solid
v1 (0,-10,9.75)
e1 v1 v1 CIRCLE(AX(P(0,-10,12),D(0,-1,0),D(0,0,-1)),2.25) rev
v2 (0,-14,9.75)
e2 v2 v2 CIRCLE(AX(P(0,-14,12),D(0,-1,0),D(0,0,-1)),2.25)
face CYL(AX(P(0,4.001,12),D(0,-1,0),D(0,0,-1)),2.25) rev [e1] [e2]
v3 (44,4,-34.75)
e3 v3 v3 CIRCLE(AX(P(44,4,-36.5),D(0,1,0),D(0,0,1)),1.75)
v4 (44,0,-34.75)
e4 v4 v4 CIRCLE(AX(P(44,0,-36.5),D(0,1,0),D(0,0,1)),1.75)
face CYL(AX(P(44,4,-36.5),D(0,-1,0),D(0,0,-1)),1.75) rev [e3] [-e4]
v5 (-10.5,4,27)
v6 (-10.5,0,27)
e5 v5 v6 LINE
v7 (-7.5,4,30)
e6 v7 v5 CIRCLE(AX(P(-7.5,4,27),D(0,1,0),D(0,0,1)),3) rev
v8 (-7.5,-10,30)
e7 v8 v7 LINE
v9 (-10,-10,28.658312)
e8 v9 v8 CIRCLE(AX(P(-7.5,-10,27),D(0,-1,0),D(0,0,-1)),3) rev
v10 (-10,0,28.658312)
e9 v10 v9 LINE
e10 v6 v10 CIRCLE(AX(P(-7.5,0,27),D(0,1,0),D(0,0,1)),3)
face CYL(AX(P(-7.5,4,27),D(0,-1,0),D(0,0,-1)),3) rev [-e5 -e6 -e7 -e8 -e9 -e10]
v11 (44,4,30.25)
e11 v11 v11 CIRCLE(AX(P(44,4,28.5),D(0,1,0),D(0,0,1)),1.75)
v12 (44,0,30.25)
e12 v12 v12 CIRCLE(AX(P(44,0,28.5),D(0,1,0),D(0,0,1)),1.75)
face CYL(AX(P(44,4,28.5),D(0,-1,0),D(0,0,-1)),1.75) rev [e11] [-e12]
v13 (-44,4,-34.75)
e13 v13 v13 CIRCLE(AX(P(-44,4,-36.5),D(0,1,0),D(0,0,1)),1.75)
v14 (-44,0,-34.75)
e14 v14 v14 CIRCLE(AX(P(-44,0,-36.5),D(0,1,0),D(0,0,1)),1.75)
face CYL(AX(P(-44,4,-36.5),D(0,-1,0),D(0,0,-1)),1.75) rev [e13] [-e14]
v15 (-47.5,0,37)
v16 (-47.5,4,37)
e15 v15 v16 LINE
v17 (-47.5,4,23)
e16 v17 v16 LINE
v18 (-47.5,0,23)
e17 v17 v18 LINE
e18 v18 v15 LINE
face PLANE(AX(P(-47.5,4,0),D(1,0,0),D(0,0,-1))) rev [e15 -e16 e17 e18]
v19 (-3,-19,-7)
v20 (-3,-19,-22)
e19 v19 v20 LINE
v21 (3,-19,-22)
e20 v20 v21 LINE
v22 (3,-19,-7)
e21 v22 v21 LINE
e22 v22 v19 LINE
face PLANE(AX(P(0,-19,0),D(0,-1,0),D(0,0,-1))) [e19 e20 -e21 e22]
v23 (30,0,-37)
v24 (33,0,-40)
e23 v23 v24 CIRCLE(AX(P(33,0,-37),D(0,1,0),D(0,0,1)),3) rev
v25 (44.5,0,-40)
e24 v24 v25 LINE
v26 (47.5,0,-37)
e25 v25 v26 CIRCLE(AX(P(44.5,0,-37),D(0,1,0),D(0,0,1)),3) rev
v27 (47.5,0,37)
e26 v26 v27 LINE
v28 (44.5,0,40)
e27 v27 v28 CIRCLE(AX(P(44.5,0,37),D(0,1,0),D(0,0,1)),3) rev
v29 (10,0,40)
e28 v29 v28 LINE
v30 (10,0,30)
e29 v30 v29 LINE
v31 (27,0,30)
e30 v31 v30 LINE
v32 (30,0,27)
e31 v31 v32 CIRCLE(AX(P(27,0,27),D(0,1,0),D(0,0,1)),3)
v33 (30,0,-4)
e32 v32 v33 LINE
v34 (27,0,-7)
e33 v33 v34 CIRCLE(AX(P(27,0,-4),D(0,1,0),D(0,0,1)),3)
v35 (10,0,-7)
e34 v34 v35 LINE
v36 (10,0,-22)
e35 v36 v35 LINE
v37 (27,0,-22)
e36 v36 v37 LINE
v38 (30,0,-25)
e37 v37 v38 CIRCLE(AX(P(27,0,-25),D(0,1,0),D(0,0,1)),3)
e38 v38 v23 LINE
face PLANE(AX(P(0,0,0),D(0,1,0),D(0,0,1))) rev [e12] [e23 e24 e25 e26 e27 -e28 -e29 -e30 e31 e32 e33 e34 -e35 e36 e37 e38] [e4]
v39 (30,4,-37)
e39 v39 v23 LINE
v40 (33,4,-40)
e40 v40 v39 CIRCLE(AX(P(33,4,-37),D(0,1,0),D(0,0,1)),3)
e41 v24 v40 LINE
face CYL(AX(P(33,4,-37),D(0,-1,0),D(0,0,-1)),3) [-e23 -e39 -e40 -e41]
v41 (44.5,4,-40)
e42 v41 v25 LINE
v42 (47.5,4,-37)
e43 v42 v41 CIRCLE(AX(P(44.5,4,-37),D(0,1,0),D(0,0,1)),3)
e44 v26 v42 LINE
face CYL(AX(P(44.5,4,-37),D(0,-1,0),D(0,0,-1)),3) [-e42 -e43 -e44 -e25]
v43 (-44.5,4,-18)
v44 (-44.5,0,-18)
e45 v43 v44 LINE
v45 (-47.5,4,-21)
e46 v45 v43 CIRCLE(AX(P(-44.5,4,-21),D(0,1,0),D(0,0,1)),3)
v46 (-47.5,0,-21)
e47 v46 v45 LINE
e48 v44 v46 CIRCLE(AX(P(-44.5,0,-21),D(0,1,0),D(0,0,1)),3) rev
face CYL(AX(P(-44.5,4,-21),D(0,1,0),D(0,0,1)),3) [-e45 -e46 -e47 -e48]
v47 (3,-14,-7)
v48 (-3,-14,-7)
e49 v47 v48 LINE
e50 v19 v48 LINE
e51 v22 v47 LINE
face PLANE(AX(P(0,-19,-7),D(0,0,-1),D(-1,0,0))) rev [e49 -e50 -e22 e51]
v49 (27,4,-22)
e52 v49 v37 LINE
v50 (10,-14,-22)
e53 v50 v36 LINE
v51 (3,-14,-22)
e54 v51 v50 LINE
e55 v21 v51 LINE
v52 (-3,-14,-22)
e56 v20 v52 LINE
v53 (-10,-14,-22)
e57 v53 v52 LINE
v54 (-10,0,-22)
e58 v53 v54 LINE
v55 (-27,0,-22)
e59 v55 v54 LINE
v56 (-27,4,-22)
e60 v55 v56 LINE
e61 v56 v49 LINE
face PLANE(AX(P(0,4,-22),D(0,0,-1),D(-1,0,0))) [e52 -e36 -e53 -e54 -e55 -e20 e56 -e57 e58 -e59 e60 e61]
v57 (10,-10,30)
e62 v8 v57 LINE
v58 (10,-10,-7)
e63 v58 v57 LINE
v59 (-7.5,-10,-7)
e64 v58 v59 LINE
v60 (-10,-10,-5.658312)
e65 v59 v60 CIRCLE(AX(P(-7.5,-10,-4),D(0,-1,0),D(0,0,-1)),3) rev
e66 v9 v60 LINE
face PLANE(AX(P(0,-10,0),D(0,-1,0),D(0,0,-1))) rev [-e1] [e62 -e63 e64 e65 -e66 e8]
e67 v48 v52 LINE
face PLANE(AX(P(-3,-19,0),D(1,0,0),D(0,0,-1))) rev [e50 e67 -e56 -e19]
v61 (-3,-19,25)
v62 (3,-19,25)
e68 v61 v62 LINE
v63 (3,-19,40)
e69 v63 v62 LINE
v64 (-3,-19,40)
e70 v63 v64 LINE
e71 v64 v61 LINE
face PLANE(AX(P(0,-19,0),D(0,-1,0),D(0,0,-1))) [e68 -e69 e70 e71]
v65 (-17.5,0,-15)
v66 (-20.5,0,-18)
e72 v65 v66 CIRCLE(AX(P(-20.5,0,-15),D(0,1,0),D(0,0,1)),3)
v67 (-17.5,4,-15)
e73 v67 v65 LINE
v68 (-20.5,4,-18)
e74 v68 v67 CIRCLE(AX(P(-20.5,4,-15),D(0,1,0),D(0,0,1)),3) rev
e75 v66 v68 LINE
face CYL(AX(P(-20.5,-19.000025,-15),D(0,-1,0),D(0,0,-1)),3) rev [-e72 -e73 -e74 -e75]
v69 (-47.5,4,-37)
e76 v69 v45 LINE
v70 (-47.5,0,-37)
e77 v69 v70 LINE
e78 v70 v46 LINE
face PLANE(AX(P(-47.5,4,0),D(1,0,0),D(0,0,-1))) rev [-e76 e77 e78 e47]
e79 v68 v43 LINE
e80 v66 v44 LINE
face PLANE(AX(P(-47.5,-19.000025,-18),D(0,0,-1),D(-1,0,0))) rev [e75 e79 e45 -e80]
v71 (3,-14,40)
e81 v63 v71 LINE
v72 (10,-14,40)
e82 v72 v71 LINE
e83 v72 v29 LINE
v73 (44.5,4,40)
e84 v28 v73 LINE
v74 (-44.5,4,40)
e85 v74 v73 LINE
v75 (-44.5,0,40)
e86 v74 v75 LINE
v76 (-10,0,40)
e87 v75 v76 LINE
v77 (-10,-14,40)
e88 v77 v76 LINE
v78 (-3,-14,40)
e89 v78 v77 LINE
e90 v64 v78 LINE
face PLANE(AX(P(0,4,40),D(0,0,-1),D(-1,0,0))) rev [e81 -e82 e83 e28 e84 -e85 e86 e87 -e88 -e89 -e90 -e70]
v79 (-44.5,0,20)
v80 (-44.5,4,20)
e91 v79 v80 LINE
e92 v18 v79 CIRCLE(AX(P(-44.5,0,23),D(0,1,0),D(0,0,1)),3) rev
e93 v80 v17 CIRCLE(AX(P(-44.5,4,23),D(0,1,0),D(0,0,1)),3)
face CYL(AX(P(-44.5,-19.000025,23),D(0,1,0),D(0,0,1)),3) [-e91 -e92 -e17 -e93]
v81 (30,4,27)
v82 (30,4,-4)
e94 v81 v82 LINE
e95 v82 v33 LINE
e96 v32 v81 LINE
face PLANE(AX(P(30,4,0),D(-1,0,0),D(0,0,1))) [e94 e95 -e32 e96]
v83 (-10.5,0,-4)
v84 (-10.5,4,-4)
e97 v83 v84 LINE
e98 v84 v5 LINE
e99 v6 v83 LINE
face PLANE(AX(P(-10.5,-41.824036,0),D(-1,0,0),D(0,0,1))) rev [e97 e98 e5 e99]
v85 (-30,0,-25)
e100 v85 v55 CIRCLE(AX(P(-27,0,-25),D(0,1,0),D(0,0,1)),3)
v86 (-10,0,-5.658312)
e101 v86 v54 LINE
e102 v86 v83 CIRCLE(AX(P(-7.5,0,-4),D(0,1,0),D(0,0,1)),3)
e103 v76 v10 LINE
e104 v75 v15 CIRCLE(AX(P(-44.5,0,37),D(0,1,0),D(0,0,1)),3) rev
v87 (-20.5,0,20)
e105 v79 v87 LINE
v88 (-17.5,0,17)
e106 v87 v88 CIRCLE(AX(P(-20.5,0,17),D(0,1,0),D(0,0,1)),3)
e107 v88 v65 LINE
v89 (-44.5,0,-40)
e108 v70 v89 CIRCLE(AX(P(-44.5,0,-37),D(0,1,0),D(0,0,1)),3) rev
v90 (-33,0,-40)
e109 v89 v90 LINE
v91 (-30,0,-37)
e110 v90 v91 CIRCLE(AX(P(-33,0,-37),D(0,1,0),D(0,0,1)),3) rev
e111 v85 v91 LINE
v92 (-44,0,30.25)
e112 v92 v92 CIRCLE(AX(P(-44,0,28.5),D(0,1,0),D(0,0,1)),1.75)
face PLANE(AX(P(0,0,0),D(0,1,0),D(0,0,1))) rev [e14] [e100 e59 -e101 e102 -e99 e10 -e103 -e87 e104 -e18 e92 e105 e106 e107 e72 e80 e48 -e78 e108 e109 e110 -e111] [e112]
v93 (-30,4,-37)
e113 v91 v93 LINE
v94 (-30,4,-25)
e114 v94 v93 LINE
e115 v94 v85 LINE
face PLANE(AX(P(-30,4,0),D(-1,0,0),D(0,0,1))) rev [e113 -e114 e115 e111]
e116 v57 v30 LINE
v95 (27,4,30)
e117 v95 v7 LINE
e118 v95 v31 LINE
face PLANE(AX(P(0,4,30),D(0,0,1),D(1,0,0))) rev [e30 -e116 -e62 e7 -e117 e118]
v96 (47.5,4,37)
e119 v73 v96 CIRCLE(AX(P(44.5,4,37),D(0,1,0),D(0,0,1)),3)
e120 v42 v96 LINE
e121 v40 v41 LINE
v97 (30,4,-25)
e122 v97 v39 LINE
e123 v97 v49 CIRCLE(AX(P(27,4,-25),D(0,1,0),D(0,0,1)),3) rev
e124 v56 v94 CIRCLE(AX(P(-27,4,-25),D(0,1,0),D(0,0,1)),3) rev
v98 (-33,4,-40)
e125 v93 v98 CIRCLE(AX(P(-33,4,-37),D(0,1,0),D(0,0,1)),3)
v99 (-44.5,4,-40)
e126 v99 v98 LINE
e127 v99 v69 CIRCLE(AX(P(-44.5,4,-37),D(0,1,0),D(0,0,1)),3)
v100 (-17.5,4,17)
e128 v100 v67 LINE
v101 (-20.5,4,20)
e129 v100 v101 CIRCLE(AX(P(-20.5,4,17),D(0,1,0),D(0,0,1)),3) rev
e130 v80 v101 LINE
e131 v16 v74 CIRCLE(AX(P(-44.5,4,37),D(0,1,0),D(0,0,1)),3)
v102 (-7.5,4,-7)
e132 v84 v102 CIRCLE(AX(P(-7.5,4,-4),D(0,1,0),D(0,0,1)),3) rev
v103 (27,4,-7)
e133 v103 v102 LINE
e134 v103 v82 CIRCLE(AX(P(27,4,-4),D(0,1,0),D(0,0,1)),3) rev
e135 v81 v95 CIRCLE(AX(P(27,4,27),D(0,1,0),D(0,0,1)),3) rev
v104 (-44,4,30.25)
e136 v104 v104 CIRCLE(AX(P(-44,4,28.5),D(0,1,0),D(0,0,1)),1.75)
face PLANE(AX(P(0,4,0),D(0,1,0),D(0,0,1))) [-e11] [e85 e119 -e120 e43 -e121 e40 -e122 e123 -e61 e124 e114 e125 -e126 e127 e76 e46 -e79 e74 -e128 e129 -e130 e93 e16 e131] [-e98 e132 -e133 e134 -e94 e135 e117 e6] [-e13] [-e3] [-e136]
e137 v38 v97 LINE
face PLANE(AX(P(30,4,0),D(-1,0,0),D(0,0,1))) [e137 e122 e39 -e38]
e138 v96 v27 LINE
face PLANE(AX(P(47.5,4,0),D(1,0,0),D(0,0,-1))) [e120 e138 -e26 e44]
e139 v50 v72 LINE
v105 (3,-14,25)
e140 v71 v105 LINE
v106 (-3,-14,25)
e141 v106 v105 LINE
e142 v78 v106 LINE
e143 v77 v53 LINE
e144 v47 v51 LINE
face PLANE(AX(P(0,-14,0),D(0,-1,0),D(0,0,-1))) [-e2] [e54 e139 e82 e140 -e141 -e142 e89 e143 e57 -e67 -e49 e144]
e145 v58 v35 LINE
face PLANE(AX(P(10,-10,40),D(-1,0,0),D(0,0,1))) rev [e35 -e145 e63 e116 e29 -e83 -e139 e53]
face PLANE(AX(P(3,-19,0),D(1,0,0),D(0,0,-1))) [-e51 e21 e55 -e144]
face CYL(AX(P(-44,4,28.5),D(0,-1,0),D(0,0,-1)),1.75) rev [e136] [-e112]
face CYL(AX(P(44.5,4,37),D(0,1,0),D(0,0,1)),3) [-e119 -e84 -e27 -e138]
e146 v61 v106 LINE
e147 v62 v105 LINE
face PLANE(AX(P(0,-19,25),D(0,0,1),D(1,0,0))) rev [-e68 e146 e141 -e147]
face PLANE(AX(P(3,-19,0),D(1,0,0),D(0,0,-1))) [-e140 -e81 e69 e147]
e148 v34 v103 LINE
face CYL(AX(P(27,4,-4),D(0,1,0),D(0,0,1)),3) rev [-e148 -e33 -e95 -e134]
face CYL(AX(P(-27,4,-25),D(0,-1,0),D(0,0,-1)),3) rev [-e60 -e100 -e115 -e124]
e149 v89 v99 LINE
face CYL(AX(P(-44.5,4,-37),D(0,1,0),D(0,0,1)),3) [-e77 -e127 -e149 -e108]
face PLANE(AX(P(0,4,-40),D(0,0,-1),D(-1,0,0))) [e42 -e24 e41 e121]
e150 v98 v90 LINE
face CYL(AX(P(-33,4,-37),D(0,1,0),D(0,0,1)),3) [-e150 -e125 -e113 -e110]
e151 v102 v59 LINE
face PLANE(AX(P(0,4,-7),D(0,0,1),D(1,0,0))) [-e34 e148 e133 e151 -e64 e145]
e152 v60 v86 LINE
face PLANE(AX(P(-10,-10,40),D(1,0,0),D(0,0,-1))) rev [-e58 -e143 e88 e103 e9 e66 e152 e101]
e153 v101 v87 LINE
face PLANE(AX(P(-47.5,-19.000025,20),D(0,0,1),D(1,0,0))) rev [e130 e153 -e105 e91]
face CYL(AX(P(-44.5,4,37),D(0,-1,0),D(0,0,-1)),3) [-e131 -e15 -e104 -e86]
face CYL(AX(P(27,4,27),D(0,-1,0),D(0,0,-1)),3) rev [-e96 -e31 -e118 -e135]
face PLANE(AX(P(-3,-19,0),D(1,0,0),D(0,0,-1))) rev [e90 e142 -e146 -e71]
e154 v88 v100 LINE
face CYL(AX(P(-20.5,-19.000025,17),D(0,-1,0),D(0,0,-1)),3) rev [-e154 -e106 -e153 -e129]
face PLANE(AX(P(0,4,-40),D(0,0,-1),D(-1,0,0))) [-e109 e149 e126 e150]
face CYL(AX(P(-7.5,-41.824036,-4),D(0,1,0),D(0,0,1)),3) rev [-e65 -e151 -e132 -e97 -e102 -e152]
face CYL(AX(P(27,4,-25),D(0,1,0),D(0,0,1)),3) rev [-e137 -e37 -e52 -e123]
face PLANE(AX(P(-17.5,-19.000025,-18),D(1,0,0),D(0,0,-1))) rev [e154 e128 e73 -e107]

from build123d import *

# Parameters (mm, degrees)
SKETCH_1_W          = 60
SKETCH_1_H          = 37
SKETCH_1_R          = 1.75
EXTRUDE_1_DEPTH     = 4
SKETCH_2_W          = 20
SKETCH_2_H          = 10
SKETCH_2_H_2        = 15
EXTRUDE_2_DEPTH     = 10
SKETCH_3_W          = 20
SKETCH_3_H          = 62
EXTRUDE_3_DEPTH     = 4
SKETCH_4_W          = 6
SKETCH_4_H          = 15
EXTRUDE_4_DEPTH     = 5
CUT_EXTRUDE_1_REACH = 66.655
SKETCH_4_3_R        = 2.25
SKETCH_5_W          = 30
SKETCH_5_H          = 38
CUT_EXTRUDE_2_DEPTH = 67.221220164
EXTRUDE_7_DEPTH     = 4
FILLET_1_R          = 3


with BuildPart() as part:
    # 草图1 → 凸台-拉伸1 (new body)
    with BuildSketch(Plane(origin=(0, 0, 0), x_dir=(1, 0, 0), z_dir=(0, 1, 0))):
        Polygon((-30, 22), (-30, 40), (-47.5, 40), (-47.5, -40), (47.5, -40), (47.5, 40), (30, 40), (30, 22), align=None)
        with Locations((0, -11.5)):
            Rectangle(SKETCH_1_W, SKETCH_1_H, mode=Mode.SUBTRACT)
        with Locations(Location((-44, 36.5, 0), (0, 0, 270))):
            Circle(SKETCH_1_R, mode=Mode.SUBTRACT)
        with Locations(Location((44, 36.5, 0), (0, 0, 270))):
            Circle(SKETCH_1_R, mode=Mode.SUBTRACT)
        with Locations(Location((-44, -28.5, 0), (0, 0, 270))):
            Circle(SKETCH_1_R, mode=Mode.SUBTRACT)
        with Locations(Location((44, -28.5, 0), (0, 0, 270))):
            Circle(SKETCH_1_R, mode=Mode.SUBTRACT)
    extrude(amount=EXTRUDE_1_DEPTH)

    # 草图2 → 凸台-拉伸2 (add)
    with BuildSketch(Plane.XZ):
        with Locations((0, 35)):
            Rectangle(SKETCH_2_W, SKETCH_2_H)
        with Locations((0, -14.5)):
            Rectangle(SKETCH_2_W, SKETCH_2_H_2)
    extrude(amount=EXTRUDE_2_DEPTH)

    # 草图3 → 凸台-拉伸3 (add)
    with BuildSketch(Plane.XZ.offset(10)):
        with Locations((0, 9)):
            Rectangle(SKETCH_3_W, SKETCH_3_H)
    extrude(amount=EXTRUDE_3_DEPTH)

    # 草图4 → 凸台-拉伸4 (add)
    with BuildSketch(Plane.XZ.offset(14)):
        with Locations((0, 32.5)):
            Rectangle(SKETCH_4_W, SKETCH_4_H)
        with Locations((0, -14.5)):
            Rectangle(SKETCH_4_W, SKETCH_4_H)
    extrude(amount=EXTRUDE_4_DEPTH)

    # 草图4<3> → 切除-拉伸1 (cut, up to next)
    with BuildSketch(Plane.XZ.offset(14), mode=Mode.PRIVATE) as cut_extrude_1_sk1:
        with Locations(Location((0, 12, 0), (0, 0, 270))):
            Circle(SKETCH_4_3_R)
    cut_extrude_1_tool1 = extrude(cut_extrude_1_sk1.sketch, amount=-CUT_EXTRUDE_1_REACH, mode=Mode.PRIVATE) & part.part
    add(cut_extrude_1_tool1.solids().sort_by_distance((0, -14, 12))[0], mode=Mode.SUBTRACT)

    # 草图5 → 切除-拉伸2 (cut, through all)
    with BuildSketch(Plane(origin=(0, 4, 0), x_dir=(1, 0, 0), z_dir=(0, 1, 0))):
        with Locations((-32.5, -1)):
            Rectangle(SKETCH_5_W, SKETCH_5_H)
    extrude(amount=-CUT_EXTRUDE_2_DEPTH, mode=Mode.SUBTRACT)

    # 草图6 → 凸台-拉伸7 (add)
    with BuildSketch(Plane(origin=(0, 4, 0), x_dir=(1, 0, 0), z_dir=(0, 1, 0))):
        Polygon((-10.5, 7), (-17.5, 7), (-17.5, -20), (-30, -20), (-30, -30), (-10.5, -30), align=None)
    extrude(amount=-EXTRUDE_7_DEPTH)

    # 圆角1
    fillet_1_edges = [part.edges().sort_by_distance(p)[0] for p in [
        (-30, 2, -22),
    ]]
    fillet(fillet_1_edges, radius=FILLET_1_R)
    fillet_1_2_edges = [part.edges().sort_by_distance(p)[0] for p in [
        (-30, 2, -40),
    ]]
    fillet(fillet_1_2_edges, radius=FILLET_1_R)
    fillet_1_3_edges = [part.edges().sort_by_distance(p)[0] for p in [
        (30, 2, -7),
    ]]
    fillet(fillet_1_3_edges, radius=FILLET_1_R)
    fillet_1_4_edges = [part.edges().sort_by_distance(p)[0] for p in [
        (30, 2, 30),
    ]]
    fillet(fillet_1_4_edges, radius=FILLET_1_R)
    fillet_1_5_edges = [part.edges().sort_by_distance(p)[0] for p in [
        (-10.5, 2, 30),
    ]]
    fillet(fillet_1_5_edges, radius=FILLET_1_R)
    fillet_1_6_edges = [part.edges().sort_by_distance(p)[0] for p in [
        (30, 2, -40),
    ]]
    fillet(fillet_1_6_edges, radius=FILLET_1_R)
    fillet_1_7_edges = [part.edges().sort_by_distance(p)[0] for p in [
        (30, 2, -22),
    ]]
    fillet(fillet_1_7_edges, radius=FILLET_1_R)
    fillet_1_8_edges = [part.edges().sort_by_distance(p)[0] for p in [
        (47.5, 2, -40),
    ]]
    fillet(fillet_1_8_edges, radius=FILLET_1_R)
    fillet_1_9_edges = [part.edges().sort_by_distance(p)[0] for p in [
        (47.5, 2, 40),
    ]]
    fillet(fillet_1_9_edges, radius=FILLET_1_R)
    fillet_1_10_edges = [part.edges().sort_by_distance(p)[0] for p in [
        (-47.5, 2, 40),
    ]]
    fillet(fillet_1_10_edges, radius=FILLET_1_R)
    fillet_1_11_edges = [part.edges().sort_by_distance(p)[0] for p in [
        (-47.5, 2, 20),
    ]]
    fillet(fillet_1_11_edges, radius=FILLET_1_R)
    fillet_1_12_edges = [part.edges().sort_by_distance(p)[0] for p in [
        (-17.5, 2, 20),
    ]]
    fillet(fillet_1_12_edges, radius=FILLET_1_R)
    fillet_1_13_edges = [part.edges().sort_by_distance(p)[0] for p in [
        (-17.5, 2, -18),
    ]]
    fillet(fillet_1_13_edges, radius=FILLET_1_R)
    fillet_1_14_edges = [part.edges().sort_by_distance(p)[0] for p in [
        (-47.5, 2, -18),
    ]]
    fillet(fillet_1_14_edges, radius=FILLET_1_R)
    fillet_1_15_edges = [part.edges().sort_by_distance(p)[0] for p in [
        (-47.5, 2, -40),
    ]]
    fillet(fillet_1_15_edges, radius=FILLET_1_R)
    fillet_1_16_edges = [part.edges().sort_by_distance(p)[0] for p in [
        (-10.5, 2, -7),
    ]]
    fillet(fillet_1_16_edges, radius=FILLET_1_R)


solid = part.part
